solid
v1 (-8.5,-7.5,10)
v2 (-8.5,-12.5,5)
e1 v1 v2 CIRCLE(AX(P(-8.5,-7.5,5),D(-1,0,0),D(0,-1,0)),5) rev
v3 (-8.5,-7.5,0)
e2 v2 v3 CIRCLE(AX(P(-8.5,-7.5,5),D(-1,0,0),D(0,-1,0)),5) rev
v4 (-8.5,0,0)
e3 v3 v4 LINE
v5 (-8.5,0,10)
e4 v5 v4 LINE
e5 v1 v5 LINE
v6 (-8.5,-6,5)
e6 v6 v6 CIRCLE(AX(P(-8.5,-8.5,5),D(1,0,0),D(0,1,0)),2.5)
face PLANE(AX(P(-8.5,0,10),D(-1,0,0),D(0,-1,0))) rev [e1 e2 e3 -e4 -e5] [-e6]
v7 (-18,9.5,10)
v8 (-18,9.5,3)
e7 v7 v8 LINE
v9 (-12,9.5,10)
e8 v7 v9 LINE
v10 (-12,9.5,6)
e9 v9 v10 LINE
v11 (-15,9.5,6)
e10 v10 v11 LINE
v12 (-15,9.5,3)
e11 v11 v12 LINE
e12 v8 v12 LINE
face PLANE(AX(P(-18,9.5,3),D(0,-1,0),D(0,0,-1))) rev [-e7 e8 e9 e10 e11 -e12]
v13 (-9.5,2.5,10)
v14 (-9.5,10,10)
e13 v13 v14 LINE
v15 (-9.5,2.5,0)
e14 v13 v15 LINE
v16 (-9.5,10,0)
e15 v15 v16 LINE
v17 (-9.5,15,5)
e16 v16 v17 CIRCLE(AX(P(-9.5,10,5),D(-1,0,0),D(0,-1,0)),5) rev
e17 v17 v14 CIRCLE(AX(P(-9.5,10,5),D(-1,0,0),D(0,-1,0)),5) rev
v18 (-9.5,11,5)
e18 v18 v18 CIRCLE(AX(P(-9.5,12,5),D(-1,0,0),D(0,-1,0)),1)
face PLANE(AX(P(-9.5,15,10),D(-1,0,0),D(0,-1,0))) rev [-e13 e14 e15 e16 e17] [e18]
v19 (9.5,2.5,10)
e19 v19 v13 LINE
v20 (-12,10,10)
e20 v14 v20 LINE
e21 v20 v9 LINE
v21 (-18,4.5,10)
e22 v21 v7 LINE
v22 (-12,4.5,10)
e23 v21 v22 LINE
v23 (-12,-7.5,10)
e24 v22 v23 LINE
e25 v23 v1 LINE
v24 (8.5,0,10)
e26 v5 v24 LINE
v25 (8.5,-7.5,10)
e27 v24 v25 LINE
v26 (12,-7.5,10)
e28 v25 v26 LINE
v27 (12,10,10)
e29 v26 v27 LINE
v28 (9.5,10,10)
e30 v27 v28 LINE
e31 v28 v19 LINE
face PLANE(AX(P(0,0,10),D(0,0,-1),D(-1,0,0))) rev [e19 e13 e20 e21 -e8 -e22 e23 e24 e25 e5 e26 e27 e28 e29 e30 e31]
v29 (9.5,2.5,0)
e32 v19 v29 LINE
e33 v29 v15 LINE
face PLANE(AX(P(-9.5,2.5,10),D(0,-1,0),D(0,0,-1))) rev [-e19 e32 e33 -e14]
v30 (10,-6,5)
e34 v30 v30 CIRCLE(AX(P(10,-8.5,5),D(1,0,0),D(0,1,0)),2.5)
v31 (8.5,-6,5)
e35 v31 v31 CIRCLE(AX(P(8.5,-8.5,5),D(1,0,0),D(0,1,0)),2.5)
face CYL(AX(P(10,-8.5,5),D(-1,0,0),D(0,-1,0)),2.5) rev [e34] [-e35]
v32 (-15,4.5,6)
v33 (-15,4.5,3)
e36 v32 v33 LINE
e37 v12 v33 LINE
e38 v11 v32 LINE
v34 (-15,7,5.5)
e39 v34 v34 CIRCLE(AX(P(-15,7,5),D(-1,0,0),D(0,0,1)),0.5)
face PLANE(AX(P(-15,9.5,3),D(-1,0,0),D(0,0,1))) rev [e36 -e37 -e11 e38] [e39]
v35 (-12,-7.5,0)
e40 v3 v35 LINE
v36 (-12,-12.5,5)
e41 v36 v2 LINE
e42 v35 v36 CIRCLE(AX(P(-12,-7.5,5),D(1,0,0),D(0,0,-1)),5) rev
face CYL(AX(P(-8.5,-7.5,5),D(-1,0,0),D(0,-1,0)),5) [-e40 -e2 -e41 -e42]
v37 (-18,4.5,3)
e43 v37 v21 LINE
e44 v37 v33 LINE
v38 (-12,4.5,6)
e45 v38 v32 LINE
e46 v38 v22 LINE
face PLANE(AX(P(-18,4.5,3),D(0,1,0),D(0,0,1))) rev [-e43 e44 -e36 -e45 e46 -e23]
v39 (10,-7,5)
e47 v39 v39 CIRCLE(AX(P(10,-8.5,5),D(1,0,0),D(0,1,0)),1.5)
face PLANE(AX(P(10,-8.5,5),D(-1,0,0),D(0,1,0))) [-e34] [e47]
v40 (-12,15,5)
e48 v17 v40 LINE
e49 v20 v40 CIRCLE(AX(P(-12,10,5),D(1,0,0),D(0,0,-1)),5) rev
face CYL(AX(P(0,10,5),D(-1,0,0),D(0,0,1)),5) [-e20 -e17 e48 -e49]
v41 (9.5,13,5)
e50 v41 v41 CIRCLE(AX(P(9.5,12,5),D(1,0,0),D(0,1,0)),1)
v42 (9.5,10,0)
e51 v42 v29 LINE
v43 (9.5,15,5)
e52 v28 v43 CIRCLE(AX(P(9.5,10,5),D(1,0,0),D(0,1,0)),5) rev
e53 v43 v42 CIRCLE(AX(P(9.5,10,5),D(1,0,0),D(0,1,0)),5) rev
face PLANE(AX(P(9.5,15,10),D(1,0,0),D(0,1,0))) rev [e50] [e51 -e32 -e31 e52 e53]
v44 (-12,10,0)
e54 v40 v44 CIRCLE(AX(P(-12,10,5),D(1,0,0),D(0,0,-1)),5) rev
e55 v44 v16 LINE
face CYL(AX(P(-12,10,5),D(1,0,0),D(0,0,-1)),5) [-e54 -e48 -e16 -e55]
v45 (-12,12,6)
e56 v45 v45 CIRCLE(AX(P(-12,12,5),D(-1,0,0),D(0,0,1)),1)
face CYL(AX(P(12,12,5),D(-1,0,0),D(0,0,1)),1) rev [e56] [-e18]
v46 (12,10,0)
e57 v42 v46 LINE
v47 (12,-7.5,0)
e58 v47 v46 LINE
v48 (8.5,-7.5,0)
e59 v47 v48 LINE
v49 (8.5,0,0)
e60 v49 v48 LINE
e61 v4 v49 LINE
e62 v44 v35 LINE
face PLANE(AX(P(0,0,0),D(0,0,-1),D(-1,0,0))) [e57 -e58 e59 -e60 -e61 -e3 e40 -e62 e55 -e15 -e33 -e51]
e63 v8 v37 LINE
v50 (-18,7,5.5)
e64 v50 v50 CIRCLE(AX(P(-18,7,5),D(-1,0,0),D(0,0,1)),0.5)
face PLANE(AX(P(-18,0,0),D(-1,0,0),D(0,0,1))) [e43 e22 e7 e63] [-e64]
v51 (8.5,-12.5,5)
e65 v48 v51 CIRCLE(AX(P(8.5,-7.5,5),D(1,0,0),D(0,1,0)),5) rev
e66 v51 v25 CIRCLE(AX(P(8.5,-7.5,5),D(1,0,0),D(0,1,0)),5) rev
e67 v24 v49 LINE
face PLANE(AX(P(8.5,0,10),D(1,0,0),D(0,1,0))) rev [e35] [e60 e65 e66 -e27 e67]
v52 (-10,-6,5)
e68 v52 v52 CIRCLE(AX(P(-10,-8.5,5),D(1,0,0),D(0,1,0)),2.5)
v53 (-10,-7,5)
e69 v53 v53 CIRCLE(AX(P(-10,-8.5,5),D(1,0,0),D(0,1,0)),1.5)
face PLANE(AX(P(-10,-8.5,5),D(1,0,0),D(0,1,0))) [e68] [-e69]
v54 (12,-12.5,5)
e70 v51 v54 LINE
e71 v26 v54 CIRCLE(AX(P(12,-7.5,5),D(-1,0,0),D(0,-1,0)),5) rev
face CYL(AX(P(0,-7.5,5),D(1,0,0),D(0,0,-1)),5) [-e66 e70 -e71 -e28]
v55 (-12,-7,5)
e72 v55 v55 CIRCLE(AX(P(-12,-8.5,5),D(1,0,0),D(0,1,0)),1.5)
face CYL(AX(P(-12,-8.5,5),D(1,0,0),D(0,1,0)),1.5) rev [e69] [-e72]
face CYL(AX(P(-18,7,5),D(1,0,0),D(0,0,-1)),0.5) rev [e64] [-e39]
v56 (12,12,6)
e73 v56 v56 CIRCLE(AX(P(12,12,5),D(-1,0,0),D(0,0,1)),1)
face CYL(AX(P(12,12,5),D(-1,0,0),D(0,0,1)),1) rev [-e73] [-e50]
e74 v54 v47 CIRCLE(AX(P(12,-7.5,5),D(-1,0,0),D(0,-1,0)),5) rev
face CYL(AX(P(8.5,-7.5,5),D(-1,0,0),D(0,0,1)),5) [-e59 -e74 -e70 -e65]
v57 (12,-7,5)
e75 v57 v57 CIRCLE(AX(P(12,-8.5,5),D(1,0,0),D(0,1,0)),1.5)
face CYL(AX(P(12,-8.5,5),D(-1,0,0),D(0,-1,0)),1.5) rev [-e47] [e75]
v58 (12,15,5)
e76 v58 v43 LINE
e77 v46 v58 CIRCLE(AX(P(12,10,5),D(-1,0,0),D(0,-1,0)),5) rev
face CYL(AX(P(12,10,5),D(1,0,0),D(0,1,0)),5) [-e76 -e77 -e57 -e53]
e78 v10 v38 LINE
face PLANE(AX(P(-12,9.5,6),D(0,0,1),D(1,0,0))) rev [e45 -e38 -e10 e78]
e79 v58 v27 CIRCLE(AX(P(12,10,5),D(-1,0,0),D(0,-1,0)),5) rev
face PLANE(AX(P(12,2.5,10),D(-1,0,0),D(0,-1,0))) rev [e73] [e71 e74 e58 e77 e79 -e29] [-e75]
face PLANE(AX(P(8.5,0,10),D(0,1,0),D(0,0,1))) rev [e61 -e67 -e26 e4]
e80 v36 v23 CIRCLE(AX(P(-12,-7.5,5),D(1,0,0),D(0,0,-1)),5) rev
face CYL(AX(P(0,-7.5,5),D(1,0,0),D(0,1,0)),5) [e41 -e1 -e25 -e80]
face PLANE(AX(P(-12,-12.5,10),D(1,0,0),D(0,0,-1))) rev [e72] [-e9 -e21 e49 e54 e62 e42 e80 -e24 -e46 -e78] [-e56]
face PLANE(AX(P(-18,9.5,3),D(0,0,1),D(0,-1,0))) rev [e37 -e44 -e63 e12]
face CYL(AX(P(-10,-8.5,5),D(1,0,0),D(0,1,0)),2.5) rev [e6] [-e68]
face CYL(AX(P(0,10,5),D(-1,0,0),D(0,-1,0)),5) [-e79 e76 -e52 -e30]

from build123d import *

# Parameters (mm, degrees)
SALIENTE_EXTRUIR1_DEPTH = 10
CROQUIS2_R              = 2.5
CORTAR_EXTRUIR1_DEPTH   = 1.5
CROQUIS3_R              = 1.5
CORTAR_EXTRUIR2_DEPTH   = 2
CORTAR_EXTRUIR3_START   = -24
CROQUIS6_R              = 1
CORTAR_EXTRUIR3_DEPTH   = 24
CROQUIS9_W              = 7
CROQUIS9_H              = 5
CROQUIS9_R              = 0.5
SALIENTE_EXTRUIR4_DEPTH = 6
CROQUIS10_W             = 3
CROQUIS10_H             = 3
CORTAR_EXTRUIR4_DEPTH   = 5
REDONDEO1_R             = 5


with BuildPart() as part:
    # Croquis1 → Saliente-Extruir1 (new body)
    with BuildSketch(Plane.XY):
        Polygon((8.5, 0), (-8.5, 0), (-8.5, -12.5), (-12, -12.5), (-12, 2.5), (-12, 15), (-9.5, 15), (-9.5, 2.5), (9.5, 2.5), (9.5, 15), (12, 15), (12, 2.5), (12, -12.5), (8.5, -12.5), align=None)
    extrude(amount=SALIENTE_EXTRUIR1_DEPTH)

    # Croquis2 → Cortar-Extruir1 (cut)
    with BuildSketch(Plane(origin=(-8.5, 0, 0), x_dir=(0, 0, -1), z_dir=(1, 0, 0))):
        with Locations(Location((-5, -8.5, 0), (0, 0, 90))):
            Circle(CROQUIS2_R)
    cortar_extruir1 = extrude(amount=-CORTAR_EXTRUIR1_DEPTH, mode=Mode.SUBTRACT)

    # Croquis3 → Cortar-Extruir2 (cut)
    with BuildSketch(Plane(origin=(-10, 0, 0), x_dir=(0, 0, -1), z_dir=(1, 0, 0))):
        with Locations(Location((-5, -8.5, 0), (0, 0, 90))):
            Circle(CROQUIS3_R)
    cortar_extruir2 = extrude(amount=-CORTAR_EXTRUIR2_DEPTH, mode=Mode.SUBTRACT)

    # Simetría1: Cortar-Extruir1, Cortar-Extruir2 across plane
    add(cortar_extruir1.mirror(Plane(origin=(0, 0, 0), x_dir=(0, 0, 1), z_dir=(1, 0, 0))), mode=Mode.SUBTRACT)
    add(cortar_extruir2.mirror(Plane(origin=(0, 0, 0), x_dir=(0, 0, 1), z_dir=(1, 0, 0))), mode=Mode.SUBTRACT)

    # Croquis6 → Cortar-Extruir3 (cut)
    with BuildSketch(Plane.ZY.offset(12).offset(CORTAR_EXTRUIR3_START)):
        with Locations((5, 12)):
            Circle(CROQUIS6_R)
    extrude(amount=CORTAR_EXTRUIR3_DEPTH, mode=Mode.SUBTRACT)

    # Croquis9 → Saliente-Extruir4 (add)
    with BuildSketch(Plane.ZY.offset(12)):
        with Locations((6.5, 7)):
            Rectangle(CROQUIS9_W, CROQUIS9_H)
        with Locations((5, 7)):
            Circle(CROQUIS9_R, mode=Mode.SUBTRACT)
    extrude(amount=SALIENTE_EXTRUIR4_DEPTH)

    # Croquis10 → Cortar-Extruir4 (cut)
    with BuildSketch(Plane.XZ.offset(-4.5)):
        with Locations((-13.5, 4.5)):
            Rectangle(CROQUIS10_W, CROQUIS10_H)
    extrude(amount=-CORTAR_EXTRUIR4_DEPTH, mode=Mode.SUBTRACT)

    # Redondeo1
    redondeo1_edges = [part.edges().sort_by_distance(p)[0] for p in [
        (10.25, -12.5, 10),
        (-10.25, -12.5, 10),
        (-10.25, -12.5, 0),
        (10.25, -12.5, 0),
        (-10.75, 15, 10),
        (-10.75, 15, 0),
        (10.75, 15, 10),
        (10.75, 15, 0),
    ]]
    fillet(redondeo1_edges, radius=REDONDEO1_R - 0.0001)  # a hair under: the kernel refuses the full size


solid = part.part
